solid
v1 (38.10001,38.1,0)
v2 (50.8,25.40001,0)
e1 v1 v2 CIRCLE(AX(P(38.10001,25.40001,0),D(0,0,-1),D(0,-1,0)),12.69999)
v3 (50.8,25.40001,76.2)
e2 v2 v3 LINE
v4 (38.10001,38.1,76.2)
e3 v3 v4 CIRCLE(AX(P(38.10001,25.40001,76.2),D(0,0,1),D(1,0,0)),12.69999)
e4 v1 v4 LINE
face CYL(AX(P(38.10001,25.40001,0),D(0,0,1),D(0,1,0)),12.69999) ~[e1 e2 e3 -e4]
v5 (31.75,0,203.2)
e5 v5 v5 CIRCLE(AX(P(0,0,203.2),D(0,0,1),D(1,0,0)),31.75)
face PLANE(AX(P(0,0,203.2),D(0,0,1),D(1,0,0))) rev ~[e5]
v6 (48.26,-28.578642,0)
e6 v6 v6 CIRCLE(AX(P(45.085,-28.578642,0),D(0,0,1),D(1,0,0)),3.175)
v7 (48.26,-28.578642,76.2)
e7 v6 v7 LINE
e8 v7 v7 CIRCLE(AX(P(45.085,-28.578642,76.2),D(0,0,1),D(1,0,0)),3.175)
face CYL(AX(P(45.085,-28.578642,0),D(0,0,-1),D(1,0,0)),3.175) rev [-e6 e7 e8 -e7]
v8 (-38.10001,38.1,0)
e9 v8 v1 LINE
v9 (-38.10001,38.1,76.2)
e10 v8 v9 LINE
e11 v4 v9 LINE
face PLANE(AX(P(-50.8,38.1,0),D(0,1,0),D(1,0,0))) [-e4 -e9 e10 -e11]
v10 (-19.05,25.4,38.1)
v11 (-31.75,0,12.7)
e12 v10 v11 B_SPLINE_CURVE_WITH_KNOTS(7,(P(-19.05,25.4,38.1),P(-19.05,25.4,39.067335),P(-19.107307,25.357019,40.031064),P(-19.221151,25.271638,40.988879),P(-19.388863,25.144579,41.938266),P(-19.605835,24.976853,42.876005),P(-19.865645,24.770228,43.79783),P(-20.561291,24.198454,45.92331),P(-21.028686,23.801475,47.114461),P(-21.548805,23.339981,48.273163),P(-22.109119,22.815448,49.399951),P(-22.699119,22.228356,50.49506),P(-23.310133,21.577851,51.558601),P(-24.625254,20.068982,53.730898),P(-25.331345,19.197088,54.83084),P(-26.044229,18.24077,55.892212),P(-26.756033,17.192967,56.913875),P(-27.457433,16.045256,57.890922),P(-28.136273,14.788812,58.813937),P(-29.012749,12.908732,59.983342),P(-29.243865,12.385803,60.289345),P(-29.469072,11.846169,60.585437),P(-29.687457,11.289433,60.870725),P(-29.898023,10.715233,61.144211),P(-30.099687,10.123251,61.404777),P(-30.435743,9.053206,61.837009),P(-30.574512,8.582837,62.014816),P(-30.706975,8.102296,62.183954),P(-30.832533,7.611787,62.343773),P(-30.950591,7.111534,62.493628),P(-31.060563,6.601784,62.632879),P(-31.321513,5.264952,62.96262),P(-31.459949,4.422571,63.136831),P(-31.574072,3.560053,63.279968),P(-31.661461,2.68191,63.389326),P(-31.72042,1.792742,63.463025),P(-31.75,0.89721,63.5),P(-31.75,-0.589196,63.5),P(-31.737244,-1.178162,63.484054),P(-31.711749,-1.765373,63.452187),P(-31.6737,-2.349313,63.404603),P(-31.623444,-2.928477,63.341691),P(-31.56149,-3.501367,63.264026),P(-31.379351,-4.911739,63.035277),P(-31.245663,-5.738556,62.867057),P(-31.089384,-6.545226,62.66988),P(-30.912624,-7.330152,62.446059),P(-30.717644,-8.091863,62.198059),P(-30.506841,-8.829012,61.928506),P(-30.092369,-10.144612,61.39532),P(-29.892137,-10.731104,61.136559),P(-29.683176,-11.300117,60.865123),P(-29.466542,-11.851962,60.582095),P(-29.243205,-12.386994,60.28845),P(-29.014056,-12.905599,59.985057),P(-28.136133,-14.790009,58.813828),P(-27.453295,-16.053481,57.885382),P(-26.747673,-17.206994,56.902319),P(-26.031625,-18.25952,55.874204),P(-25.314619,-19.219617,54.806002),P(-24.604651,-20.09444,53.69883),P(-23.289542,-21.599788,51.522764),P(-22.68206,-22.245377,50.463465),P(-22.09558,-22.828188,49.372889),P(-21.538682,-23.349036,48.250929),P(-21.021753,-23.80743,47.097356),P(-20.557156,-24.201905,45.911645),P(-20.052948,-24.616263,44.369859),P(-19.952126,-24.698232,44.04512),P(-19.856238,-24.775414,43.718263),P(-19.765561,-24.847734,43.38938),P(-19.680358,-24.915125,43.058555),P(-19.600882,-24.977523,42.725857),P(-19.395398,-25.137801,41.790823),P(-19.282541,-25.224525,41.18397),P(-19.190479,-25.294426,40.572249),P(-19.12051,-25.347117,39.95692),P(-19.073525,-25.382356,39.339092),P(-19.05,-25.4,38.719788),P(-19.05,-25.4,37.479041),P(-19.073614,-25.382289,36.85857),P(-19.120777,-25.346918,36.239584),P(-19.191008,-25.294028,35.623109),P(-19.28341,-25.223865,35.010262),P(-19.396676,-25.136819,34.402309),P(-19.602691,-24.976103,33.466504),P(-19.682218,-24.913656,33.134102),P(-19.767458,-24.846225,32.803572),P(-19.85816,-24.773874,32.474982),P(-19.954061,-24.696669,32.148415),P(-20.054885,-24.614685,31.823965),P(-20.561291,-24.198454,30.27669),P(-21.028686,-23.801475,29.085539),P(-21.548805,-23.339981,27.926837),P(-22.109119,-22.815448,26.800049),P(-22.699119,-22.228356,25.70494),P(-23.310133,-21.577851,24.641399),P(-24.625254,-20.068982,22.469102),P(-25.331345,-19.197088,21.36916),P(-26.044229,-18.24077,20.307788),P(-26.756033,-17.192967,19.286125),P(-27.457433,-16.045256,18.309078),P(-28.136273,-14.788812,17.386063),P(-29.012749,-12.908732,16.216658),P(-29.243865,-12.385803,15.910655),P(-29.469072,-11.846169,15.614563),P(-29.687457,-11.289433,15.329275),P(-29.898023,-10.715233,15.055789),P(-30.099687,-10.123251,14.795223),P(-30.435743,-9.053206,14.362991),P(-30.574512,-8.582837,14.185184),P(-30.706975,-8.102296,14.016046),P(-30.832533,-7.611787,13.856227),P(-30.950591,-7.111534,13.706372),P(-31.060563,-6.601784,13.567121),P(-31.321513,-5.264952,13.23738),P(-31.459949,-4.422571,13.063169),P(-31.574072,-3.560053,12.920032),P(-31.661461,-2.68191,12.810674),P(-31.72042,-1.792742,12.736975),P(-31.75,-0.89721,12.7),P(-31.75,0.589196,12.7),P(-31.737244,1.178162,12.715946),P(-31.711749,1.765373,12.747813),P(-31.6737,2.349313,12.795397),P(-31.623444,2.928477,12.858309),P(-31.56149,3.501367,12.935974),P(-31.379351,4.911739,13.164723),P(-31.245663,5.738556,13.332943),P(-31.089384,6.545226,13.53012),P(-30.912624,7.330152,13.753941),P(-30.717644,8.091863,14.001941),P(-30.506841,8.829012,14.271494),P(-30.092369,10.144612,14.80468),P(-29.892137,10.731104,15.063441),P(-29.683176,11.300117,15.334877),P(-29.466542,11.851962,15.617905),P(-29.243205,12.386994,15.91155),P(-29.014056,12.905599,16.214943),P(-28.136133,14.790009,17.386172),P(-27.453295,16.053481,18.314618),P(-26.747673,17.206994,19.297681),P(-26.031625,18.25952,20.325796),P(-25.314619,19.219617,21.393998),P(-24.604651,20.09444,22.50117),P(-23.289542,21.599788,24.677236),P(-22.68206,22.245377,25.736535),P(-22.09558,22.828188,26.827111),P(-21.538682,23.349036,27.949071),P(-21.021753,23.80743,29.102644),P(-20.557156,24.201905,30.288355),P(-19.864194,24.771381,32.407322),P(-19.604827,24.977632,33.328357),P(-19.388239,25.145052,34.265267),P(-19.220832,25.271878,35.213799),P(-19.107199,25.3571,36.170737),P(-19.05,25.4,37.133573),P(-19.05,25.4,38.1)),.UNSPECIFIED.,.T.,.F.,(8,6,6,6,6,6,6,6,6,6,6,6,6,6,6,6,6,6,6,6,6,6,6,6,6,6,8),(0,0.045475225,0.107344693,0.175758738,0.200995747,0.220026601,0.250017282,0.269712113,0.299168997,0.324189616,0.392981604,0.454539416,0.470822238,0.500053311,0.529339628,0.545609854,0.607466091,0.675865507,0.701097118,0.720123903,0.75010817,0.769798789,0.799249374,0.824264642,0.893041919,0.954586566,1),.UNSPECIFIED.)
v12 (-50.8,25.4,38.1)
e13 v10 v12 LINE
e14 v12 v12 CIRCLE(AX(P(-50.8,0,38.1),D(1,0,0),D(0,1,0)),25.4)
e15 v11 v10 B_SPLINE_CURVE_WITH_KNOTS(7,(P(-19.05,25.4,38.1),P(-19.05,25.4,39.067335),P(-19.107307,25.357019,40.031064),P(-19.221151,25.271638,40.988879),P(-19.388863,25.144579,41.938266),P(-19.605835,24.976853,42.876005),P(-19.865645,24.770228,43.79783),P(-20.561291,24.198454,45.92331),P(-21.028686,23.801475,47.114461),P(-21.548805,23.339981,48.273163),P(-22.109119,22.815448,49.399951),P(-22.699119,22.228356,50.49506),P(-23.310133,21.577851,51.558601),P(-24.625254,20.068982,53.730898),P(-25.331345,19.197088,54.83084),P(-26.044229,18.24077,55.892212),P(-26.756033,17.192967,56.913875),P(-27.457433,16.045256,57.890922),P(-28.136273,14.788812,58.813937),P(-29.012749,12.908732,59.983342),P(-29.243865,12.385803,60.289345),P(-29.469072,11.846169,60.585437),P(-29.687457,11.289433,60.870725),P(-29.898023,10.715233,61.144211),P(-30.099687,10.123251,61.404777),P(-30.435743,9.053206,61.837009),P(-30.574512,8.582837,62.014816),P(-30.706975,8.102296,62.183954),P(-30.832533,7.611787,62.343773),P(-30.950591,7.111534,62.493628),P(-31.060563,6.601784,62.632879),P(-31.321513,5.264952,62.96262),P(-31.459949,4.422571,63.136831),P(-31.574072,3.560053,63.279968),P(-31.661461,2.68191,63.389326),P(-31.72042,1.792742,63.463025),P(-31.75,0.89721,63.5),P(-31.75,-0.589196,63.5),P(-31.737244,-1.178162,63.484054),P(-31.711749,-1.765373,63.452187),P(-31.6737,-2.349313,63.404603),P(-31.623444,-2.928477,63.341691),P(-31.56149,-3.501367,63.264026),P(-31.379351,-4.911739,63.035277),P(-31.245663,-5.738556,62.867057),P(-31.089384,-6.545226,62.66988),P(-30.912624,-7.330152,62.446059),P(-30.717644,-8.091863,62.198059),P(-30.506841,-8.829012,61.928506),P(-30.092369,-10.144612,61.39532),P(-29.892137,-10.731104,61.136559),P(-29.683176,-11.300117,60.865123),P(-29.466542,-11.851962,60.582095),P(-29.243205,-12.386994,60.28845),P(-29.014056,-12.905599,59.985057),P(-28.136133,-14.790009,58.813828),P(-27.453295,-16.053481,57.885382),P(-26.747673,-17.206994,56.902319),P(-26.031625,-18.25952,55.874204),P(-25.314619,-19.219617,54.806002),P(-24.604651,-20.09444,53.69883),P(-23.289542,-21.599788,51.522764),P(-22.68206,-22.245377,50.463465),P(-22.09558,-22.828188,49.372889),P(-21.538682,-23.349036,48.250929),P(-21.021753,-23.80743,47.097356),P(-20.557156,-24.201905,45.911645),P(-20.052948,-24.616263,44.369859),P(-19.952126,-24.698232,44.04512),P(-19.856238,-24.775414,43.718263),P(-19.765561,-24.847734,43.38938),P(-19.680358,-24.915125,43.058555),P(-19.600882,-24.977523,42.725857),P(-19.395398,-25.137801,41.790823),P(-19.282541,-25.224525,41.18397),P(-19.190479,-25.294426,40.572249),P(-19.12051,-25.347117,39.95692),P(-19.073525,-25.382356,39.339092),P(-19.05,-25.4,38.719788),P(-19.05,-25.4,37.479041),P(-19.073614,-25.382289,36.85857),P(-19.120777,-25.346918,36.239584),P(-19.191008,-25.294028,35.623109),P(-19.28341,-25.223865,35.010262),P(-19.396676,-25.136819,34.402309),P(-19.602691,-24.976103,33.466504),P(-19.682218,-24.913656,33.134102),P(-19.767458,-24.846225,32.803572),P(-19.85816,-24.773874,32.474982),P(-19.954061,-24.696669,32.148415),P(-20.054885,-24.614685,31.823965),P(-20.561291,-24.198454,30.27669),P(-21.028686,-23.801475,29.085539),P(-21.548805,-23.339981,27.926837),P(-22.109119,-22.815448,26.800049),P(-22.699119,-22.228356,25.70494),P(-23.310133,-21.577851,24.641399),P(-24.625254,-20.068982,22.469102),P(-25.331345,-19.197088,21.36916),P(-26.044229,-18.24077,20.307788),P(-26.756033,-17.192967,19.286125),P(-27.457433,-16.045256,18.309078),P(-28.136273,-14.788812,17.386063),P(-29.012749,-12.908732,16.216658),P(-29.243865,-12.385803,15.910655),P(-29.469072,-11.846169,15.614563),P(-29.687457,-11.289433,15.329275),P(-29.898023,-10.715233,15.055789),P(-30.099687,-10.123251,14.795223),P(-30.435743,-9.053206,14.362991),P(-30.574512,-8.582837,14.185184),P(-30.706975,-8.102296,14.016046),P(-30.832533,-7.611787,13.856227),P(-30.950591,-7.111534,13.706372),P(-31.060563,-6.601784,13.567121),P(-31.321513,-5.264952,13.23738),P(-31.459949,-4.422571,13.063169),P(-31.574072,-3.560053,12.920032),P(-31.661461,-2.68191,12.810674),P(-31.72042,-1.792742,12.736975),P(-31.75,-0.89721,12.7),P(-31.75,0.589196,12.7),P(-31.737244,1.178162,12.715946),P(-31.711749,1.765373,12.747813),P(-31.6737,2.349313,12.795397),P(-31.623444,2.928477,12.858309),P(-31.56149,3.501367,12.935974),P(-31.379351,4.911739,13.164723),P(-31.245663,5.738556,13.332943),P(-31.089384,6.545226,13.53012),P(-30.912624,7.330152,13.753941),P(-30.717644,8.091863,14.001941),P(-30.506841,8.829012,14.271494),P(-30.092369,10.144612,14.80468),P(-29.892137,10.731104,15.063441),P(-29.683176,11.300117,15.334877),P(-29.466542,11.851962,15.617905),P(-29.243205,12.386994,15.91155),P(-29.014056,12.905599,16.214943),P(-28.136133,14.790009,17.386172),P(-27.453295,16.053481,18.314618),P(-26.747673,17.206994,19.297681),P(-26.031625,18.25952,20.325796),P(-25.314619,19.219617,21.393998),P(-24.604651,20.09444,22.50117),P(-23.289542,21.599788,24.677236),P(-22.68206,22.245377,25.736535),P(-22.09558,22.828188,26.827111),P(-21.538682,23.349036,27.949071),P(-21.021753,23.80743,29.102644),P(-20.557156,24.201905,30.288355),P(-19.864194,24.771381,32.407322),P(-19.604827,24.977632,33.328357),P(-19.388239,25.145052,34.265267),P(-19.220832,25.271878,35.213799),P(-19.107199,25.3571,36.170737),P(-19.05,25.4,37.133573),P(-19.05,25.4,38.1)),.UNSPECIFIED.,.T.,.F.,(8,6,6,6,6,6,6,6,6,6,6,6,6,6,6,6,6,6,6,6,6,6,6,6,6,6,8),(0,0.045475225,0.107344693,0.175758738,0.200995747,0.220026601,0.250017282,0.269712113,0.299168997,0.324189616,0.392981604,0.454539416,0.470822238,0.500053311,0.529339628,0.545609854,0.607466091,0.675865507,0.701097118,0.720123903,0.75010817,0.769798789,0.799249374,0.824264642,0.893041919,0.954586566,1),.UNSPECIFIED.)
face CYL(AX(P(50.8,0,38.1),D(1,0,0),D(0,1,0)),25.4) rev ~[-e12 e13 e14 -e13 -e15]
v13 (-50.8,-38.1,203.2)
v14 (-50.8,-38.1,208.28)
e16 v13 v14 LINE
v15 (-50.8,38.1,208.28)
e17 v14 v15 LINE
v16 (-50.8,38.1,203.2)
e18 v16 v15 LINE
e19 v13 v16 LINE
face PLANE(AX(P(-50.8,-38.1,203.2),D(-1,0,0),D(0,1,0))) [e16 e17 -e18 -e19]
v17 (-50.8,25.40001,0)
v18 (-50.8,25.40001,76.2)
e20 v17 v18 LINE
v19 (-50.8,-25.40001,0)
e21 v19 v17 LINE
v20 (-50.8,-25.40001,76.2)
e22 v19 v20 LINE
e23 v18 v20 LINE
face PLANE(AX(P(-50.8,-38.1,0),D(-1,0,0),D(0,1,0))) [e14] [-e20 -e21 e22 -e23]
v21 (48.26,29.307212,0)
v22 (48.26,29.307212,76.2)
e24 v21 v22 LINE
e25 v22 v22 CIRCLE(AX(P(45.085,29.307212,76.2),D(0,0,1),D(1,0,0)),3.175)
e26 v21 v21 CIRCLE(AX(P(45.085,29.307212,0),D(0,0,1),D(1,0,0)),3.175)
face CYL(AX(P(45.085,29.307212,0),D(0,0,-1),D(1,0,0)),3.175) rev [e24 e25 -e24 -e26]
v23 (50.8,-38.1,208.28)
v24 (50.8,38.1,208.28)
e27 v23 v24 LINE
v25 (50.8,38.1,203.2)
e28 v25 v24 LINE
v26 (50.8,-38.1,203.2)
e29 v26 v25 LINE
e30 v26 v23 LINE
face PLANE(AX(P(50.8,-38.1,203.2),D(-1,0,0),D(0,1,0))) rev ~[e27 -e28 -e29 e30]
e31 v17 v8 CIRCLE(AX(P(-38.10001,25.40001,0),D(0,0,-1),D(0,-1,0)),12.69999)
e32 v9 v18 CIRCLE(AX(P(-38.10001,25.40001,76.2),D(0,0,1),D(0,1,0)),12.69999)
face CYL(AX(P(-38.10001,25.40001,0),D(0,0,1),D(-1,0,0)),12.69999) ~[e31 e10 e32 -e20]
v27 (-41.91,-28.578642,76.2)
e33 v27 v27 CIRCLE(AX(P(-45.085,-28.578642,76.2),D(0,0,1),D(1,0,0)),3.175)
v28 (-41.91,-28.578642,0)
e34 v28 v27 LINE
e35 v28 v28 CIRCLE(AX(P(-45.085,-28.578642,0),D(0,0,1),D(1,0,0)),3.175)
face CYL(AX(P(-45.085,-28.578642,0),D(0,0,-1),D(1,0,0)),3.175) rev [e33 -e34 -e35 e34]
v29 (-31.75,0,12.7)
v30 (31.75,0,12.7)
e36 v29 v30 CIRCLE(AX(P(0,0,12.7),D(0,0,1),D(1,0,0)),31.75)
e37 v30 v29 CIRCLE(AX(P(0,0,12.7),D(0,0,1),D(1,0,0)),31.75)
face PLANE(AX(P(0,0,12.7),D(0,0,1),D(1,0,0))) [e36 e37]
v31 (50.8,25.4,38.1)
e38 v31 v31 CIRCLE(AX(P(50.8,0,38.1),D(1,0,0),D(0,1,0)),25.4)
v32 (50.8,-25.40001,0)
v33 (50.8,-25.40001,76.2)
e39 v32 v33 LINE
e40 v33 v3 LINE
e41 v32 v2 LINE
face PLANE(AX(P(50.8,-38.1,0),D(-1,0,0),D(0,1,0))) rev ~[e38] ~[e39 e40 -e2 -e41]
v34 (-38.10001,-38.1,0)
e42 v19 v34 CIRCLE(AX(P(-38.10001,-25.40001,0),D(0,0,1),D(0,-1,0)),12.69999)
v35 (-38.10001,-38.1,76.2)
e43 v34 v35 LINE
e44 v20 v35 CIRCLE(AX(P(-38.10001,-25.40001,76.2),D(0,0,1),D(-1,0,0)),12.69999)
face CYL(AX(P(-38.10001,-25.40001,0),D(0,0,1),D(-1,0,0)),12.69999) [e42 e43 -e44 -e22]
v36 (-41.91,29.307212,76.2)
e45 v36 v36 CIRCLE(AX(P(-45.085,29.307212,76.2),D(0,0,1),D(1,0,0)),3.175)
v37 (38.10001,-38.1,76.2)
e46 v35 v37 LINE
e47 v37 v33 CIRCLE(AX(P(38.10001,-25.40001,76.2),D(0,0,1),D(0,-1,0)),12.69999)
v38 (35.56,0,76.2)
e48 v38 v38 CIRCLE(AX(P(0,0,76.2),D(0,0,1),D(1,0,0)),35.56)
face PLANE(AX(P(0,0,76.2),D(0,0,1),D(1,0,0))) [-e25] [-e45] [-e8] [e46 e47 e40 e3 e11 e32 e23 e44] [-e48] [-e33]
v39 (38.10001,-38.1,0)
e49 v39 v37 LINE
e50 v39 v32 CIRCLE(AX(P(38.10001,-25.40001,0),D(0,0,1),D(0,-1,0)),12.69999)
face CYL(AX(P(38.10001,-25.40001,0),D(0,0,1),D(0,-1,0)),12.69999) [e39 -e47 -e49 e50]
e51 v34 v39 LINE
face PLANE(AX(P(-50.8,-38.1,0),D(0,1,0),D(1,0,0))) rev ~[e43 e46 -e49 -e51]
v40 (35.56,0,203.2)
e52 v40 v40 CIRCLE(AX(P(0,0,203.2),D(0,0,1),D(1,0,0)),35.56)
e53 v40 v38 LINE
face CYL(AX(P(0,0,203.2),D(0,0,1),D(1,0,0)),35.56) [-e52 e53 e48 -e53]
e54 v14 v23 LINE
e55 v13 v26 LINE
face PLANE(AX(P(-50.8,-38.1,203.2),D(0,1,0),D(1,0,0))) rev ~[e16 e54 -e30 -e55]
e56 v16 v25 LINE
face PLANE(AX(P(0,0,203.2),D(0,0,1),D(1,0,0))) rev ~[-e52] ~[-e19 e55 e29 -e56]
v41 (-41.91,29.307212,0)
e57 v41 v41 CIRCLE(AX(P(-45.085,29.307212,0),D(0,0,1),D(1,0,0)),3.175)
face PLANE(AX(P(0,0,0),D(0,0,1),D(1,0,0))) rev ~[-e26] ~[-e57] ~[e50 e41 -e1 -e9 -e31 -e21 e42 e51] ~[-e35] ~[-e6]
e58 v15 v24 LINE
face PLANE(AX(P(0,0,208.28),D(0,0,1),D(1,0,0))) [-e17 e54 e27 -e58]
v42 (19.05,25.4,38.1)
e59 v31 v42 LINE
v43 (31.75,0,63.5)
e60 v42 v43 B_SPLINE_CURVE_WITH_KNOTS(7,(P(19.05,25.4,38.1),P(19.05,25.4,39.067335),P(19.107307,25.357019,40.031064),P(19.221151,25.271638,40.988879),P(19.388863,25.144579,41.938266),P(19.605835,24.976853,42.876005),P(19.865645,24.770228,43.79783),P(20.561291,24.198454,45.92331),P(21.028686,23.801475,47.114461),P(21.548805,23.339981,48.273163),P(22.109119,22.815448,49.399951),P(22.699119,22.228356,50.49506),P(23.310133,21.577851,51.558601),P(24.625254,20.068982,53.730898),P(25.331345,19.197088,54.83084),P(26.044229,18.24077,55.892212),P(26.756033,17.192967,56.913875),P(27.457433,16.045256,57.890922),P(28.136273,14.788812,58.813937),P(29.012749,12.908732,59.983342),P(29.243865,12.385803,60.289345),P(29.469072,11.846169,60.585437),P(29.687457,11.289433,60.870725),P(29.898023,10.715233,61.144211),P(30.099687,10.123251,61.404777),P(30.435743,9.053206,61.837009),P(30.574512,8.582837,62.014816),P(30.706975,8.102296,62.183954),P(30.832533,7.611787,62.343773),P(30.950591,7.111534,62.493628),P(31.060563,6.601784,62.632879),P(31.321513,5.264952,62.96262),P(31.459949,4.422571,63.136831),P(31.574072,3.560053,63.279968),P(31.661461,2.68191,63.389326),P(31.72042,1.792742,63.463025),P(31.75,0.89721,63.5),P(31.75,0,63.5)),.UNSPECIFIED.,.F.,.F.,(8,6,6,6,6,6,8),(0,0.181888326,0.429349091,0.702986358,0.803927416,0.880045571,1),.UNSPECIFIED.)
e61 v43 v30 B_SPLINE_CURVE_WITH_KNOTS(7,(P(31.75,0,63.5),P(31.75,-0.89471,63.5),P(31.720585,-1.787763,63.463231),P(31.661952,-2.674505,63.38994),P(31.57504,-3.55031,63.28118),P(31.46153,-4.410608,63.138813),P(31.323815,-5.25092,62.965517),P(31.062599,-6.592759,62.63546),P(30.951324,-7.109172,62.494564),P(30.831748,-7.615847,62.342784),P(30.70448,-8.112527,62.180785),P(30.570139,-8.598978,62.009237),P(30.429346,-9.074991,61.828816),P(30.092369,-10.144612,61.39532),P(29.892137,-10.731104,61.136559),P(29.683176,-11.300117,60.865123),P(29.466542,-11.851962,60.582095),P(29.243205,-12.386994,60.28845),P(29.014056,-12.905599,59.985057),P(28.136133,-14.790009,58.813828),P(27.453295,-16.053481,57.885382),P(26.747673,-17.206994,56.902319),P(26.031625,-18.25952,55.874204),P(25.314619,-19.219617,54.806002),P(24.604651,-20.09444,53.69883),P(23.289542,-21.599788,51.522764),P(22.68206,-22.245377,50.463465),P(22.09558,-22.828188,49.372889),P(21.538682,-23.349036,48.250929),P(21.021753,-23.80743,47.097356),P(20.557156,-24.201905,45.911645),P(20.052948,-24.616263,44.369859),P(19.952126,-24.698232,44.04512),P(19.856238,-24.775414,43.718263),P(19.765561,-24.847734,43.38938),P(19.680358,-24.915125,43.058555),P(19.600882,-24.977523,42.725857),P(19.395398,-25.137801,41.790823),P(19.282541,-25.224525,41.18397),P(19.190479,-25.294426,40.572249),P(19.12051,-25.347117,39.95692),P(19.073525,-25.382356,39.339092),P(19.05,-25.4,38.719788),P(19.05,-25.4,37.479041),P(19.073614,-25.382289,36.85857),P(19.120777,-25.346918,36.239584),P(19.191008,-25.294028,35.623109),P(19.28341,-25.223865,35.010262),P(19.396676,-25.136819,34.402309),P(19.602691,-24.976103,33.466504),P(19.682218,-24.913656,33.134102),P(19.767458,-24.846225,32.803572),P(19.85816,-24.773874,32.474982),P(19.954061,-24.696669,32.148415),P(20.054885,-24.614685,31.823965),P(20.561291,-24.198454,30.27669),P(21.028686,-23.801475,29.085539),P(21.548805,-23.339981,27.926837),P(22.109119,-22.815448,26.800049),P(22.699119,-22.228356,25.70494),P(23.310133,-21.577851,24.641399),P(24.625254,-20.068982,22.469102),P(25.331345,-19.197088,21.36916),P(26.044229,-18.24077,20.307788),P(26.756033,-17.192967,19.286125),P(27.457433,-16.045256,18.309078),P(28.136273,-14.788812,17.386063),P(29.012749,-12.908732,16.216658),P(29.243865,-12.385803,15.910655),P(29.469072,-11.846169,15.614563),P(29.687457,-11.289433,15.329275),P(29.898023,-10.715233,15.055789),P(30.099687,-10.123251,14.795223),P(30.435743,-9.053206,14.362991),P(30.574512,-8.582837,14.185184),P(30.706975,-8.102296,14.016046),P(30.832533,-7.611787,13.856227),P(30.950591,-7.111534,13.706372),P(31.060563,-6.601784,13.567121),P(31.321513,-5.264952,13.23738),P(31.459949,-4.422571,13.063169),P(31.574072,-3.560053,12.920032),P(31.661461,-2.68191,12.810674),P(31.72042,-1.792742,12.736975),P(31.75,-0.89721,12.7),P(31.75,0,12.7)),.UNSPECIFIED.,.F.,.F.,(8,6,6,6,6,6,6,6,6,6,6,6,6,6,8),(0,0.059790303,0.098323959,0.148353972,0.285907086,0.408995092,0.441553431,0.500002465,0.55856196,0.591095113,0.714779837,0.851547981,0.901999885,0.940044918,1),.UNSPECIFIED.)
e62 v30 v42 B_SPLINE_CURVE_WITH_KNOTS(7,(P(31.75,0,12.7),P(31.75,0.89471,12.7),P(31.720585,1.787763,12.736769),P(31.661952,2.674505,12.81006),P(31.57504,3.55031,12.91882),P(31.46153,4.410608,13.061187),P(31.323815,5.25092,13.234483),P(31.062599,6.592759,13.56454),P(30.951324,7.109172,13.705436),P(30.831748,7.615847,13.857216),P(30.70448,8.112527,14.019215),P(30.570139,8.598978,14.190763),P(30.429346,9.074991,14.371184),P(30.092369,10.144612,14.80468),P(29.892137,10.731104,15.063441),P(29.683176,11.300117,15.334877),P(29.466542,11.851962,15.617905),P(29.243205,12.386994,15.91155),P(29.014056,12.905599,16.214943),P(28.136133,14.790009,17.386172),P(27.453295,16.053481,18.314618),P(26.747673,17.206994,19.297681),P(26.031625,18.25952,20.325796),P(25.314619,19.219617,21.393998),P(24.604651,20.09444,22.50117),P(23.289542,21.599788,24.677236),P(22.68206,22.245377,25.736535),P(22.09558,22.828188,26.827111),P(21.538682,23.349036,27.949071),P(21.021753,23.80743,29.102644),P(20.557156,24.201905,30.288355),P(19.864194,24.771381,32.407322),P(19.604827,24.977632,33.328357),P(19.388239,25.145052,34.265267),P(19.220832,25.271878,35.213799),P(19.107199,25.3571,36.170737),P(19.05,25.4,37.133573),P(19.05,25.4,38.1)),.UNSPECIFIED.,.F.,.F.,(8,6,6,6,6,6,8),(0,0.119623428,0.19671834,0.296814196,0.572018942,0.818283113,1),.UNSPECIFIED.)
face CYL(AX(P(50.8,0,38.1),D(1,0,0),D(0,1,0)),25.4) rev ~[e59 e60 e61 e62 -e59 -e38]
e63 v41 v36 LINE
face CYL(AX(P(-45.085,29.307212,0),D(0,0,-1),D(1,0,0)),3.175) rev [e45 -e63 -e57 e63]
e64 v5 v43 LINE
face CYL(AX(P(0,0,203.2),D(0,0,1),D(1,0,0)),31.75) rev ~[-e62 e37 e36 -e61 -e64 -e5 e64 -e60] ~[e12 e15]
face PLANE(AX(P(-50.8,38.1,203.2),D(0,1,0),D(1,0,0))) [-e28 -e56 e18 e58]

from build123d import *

# Parameters (mm, degrees)
F0_W      = 101.6
F0_H      = 76.2
F0_R      = 3.175
F1_DEPTH  = 203.2
F2_R      = 25.4
F3_DEPTH  = 101.6
F4_R      = 31.75
F5_DEPTH  = 190.5
F6_R      = 12.69999
F7_R      = 3.175
F7_R_2    = 35.56
F8_DEPTH  = 127
F10_W     = 101.6
F10_H     = 76.2
F11_DEPTH = 5.08


# Not quite as in the source:
# - a fillet or chamfer is up to 0.001 mm smaller than in the source, because OpenCascade refuses the exact size


with BuildPart() as f1:
    # F0 (on Top) → F1 (new body)
    with BuildSketch(Plane.XY):
        Rectangle(F0_W, F0_H)
        with Locations((-45.085, -28.5786420731)):
            Circle(F0_R, mode=Mode.SUBTRACT)
        with Locations((45.085, -28.5786420731)):
            Circle(F0_R, mode=Mode.SUBTRACT)
        with Locations((-45.085, 29.3072120343)):
            Circle(F0_R, mode=Mode.SUBTRACT)
        with Locations((45.085, 29.3072120343)):
            Circle(F0_R, mode=Mode.SUBTRACT)
    extrude(amount=F1_DEPTH)

    # F2 (on face) → F3 (cut)
    with BuildSketch(Plane.YZ.offset(50.8)):
        with Locations((0, 38.1)):
            Circle(F2_R)
    extrude(amount=-F3_DEPTH, mode=Mode.SUBTRACT)

    # F4 (on face) → F5 (cut)
    with BuildSketch(Plane.XY.offset(203.2)):
        Circle(F4_R)
    extrude(amount=-F5_DEPTH, mode=Mode.SUBTRACT)

    # F6 (radius 12.7 in the source; OpenCascade refuses exactly that, so slightly less here)
    f6_edges = [f1.edges().sort_by_distance(p)[0] for p in [
        (-50.8, 38.1, 101.6),
        (-50.8, -38.1, 101.6),
        (50.8, -38.1, 101.6),
        (50.8, 38.1, 101.6),
    ]]
    fillet(f6_edges, radius=F6_R)

    # F7 (on face) → F8 (cut)
    with BuildSketch(Plane.XY.offset(203.2)):
        with BuildLine():
            ThreePointArc((50.8, 25.40001), (47.08025905, 34.38025905), (38.10001, 38.1))
            Line((38.10001, 38.1), (-38.10001, 38.1))
            ThreePointArc((-38.10001, 38.1), (-47.08025905, 34.38025905), (-50.8, 25.40001))
            Line((-50.8, 25.40001), (-50.8, -25.40001))
            ThreePointArc((-50.8, -25.40001), (-47.08025905, -34.38025905), (-38.10001, -38.1))
            Line((-38.10001, -38.1), (38.10001, -38.1))
            ThreePointArc((38.10001, -38.1), (47.08025905, -34.38025905), (50.8, -25.40001))
            Line((50.8, -25.40001), (50.8, 25.40001))
        make_face()
        with Locations((-45.085, -28.5786420731)):
            Circle(F7_R, mode=Mode.SUBTRACT)
        with Locations((45.085, -28.5786420731)):
            Circle(F7_R, mode=Mode.SUBTRACT)
        Circle(F7_R_2, mode=Mode.SUBTRACT)
        with Locations((-45.085, 29.3072120343)):
            Circle(F7_R, mode=Mode.SUBTRACT)
        with Locations((45.085, 29.3072120343)):
            Circle(F7_R, mode=Mode.SUBTRACT)
    extrude(amount=-F8_DEPTH, mode=Mode.SUBTRACT)

    # F10 (on offset) → F11 (join)
    with BuildSketch(Plane.XY.offset(203.2)):
        Rectangle(F10_W, F10_H)
    extrude(amount=F11_DEPTH)


solid = f1.part
